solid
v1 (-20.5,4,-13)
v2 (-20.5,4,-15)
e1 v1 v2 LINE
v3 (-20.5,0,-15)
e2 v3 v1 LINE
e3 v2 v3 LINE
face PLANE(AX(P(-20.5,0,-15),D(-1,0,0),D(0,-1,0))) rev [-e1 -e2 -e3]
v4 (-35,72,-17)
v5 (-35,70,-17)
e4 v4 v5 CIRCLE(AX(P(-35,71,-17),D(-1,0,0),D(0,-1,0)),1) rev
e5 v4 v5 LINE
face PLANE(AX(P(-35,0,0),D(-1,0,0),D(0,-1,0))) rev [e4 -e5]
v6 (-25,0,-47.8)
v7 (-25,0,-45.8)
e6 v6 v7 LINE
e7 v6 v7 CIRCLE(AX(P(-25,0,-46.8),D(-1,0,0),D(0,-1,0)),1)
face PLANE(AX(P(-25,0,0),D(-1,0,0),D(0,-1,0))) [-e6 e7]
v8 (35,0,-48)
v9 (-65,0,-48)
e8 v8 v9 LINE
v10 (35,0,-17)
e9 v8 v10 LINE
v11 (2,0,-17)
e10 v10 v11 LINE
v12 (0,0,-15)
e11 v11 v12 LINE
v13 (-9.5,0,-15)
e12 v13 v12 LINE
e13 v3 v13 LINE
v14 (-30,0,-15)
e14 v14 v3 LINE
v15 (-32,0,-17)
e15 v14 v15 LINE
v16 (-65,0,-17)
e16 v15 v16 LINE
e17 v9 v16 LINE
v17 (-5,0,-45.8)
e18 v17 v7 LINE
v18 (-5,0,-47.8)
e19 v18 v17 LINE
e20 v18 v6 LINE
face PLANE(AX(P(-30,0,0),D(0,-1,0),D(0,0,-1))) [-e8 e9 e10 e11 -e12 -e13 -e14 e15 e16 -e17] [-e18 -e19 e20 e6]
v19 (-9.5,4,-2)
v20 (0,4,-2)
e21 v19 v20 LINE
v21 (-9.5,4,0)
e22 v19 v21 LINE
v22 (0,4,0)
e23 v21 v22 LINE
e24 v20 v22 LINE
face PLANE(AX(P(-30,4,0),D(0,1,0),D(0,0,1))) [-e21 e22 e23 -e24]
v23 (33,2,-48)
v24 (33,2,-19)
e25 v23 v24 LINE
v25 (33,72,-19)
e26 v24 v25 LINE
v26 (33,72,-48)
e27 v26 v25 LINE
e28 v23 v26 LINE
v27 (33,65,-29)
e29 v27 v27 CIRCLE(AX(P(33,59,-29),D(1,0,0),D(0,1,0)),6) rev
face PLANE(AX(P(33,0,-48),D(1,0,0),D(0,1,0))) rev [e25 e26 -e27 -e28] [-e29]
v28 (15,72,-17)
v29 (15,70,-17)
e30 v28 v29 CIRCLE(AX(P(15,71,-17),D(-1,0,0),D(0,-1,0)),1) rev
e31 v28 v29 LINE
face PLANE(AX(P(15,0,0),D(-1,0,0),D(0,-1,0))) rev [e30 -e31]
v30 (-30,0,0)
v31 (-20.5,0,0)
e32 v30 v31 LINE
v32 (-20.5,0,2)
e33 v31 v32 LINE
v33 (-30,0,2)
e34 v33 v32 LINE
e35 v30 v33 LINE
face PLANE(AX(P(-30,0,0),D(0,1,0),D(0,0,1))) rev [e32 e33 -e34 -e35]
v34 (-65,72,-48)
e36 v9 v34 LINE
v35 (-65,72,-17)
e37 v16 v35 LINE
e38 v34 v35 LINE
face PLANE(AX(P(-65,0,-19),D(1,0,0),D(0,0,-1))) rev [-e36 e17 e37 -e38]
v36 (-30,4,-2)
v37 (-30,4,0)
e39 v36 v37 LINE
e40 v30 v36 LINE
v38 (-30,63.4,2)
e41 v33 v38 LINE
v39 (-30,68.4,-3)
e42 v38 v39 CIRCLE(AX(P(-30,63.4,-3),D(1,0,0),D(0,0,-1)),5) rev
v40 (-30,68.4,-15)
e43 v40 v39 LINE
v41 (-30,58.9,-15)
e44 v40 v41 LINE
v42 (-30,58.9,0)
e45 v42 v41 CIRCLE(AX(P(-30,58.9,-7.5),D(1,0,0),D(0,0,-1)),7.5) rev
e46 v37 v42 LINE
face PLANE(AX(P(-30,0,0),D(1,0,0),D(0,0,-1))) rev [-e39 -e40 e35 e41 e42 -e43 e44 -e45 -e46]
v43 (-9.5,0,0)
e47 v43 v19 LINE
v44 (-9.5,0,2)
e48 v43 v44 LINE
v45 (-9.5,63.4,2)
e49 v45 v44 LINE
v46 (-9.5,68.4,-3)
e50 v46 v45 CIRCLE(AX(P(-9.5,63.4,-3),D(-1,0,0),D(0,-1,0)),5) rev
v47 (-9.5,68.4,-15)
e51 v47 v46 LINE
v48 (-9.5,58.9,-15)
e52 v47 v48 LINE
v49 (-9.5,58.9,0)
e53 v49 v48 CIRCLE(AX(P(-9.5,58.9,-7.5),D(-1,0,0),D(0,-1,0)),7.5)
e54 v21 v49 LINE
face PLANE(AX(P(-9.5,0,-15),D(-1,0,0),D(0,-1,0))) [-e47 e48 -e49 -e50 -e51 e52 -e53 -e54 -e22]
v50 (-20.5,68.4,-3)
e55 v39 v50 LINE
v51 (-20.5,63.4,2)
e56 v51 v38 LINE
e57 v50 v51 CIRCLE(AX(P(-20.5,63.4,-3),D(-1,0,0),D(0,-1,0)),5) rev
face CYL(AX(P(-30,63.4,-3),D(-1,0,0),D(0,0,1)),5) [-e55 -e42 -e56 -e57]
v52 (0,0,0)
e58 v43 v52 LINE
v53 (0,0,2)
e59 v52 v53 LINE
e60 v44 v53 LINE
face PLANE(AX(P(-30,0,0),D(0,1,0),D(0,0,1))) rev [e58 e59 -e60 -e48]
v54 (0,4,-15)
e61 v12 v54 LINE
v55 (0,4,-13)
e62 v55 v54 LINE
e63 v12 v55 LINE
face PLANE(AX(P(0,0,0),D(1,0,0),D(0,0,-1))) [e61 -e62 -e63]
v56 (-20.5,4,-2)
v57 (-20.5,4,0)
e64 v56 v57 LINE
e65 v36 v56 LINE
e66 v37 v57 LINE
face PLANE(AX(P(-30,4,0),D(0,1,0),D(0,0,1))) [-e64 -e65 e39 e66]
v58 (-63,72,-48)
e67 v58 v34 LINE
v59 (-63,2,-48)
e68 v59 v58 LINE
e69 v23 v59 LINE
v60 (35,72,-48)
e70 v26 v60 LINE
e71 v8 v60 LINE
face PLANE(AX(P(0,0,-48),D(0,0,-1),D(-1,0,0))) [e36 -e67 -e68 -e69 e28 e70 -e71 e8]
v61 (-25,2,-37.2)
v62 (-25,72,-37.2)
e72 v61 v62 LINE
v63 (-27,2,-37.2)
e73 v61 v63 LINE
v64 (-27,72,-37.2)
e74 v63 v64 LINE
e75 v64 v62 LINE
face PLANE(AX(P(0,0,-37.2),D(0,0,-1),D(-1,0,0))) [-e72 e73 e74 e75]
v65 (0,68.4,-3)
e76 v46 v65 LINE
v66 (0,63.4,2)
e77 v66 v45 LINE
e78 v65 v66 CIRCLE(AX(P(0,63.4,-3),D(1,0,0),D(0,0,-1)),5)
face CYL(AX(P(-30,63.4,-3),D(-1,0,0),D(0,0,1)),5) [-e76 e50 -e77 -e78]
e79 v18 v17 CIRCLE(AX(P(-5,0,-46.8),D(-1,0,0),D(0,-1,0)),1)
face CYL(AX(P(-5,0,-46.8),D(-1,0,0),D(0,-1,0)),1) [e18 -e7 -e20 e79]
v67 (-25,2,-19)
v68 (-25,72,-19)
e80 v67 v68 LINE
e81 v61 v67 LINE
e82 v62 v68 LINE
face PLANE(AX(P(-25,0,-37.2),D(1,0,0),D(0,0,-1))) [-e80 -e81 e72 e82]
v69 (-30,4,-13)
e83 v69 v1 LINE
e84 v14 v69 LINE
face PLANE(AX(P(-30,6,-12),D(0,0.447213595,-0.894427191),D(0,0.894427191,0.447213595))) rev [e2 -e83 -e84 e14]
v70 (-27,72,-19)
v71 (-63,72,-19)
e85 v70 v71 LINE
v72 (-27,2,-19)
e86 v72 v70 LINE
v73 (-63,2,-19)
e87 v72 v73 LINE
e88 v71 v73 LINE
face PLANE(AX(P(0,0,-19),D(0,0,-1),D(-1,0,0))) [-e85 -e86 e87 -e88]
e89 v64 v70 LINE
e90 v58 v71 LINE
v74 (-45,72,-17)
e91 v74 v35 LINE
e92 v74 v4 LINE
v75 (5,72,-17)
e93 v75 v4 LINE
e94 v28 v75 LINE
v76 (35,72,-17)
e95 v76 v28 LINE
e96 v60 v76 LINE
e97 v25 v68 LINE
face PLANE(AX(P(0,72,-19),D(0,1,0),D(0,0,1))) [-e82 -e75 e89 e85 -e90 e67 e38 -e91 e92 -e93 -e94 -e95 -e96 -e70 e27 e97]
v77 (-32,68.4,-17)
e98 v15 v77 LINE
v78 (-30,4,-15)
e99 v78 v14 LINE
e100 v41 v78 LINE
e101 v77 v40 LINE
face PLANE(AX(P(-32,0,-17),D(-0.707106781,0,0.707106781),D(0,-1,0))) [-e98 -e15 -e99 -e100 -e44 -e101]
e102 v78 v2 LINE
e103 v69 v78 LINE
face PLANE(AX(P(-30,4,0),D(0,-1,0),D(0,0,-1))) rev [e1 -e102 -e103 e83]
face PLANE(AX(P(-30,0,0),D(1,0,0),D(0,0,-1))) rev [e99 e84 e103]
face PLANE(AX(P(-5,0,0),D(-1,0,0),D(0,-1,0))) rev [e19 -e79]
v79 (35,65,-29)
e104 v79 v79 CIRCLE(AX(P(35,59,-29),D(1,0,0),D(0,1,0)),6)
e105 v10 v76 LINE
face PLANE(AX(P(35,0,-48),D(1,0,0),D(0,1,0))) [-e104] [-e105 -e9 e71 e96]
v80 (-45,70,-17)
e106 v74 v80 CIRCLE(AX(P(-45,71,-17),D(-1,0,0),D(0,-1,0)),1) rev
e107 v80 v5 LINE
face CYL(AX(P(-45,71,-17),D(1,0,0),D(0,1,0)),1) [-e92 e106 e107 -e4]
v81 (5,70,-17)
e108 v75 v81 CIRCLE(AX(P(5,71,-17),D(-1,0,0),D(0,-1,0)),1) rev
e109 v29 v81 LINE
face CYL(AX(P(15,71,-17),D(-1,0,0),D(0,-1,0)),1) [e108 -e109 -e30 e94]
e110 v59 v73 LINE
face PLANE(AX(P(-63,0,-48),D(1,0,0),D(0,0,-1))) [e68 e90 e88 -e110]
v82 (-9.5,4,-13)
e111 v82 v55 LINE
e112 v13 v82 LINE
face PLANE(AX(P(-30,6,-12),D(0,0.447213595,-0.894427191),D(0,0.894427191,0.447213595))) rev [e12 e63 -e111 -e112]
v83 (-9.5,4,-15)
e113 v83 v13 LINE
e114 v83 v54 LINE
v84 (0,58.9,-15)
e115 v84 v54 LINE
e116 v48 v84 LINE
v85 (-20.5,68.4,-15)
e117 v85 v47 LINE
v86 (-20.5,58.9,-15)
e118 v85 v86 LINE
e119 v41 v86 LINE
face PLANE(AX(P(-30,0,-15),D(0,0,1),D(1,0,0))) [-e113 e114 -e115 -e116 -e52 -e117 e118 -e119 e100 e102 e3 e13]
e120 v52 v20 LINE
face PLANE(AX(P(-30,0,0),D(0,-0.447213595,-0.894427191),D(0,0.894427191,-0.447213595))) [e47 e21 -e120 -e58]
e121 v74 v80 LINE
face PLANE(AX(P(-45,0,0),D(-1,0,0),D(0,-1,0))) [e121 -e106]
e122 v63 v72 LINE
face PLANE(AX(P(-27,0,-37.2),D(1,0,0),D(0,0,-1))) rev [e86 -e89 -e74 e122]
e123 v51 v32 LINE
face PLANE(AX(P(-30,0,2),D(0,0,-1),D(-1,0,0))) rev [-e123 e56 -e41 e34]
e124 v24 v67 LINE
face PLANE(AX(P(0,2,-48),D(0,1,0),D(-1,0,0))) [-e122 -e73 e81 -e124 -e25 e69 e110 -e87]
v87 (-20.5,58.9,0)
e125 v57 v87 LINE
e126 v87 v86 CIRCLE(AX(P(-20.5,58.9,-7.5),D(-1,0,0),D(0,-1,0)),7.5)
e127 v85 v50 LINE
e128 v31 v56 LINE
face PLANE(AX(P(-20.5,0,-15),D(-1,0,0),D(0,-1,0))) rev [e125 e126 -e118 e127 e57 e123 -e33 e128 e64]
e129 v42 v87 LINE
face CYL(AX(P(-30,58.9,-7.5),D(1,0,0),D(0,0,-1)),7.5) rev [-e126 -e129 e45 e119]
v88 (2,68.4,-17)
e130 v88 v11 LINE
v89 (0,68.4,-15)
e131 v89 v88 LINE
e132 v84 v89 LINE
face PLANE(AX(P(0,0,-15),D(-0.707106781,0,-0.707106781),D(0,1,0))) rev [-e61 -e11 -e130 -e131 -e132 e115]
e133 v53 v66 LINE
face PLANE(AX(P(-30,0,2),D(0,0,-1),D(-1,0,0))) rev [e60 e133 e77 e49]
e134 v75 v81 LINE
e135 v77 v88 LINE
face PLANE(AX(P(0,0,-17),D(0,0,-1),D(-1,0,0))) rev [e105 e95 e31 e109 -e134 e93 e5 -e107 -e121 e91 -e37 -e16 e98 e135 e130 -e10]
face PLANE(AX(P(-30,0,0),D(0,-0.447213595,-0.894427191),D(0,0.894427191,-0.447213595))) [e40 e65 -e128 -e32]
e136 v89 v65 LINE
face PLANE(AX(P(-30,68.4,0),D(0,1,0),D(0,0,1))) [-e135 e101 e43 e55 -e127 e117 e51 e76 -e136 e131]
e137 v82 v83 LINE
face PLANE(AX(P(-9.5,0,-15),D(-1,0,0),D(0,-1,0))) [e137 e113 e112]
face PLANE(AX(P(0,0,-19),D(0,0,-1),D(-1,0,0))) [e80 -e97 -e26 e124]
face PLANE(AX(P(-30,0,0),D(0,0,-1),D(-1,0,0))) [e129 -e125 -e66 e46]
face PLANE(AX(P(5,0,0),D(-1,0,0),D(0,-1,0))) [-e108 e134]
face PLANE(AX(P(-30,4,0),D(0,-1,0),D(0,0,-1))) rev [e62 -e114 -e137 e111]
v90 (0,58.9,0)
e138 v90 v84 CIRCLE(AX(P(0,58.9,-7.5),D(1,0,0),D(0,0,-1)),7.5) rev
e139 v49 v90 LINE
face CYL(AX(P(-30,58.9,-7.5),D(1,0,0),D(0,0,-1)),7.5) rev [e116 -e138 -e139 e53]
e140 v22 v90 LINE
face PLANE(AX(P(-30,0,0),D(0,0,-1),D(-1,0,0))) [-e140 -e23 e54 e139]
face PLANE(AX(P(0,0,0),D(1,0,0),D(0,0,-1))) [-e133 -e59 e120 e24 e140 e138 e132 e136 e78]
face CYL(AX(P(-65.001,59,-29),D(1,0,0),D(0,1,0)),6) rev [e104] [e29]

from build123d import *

# Parameters (mm, degrees)
BOSS_EXTRUDE1_DEPTH      = 30
FILLET1_R                = 5
SKETCH2_W                = 11
SKETCH2_H                = 68.4
CUT_EXTRUDE1_DEPTH       = 17
BOSS_EXTRUDE3_DEPTH      = 2
BOSS_EXTRUDE4_DEPTH      = 31
SKETCH4_W                = 2
SKETCH4_H                = 70
BOSS_EXTRUDE5_DEPTH      = 18.2
BOSS_EXTRUDE6_DEPTH      = 10
BOSS_EXTRUDE6_DEPTH_BACK = 10
BOSS_EXTRUDE7_START      = 20
BOSS_EXTRUDE7_DEPTH      = 10
BOSS_EXTRUDE8_START      = -30
BOSS_EXTRUDE8_DEPTH      = 10
CHAMFER1_SIZE            = 2
CUT_EXTRUDE2_REACH       = 134.242
SKETCH6_R                = 6


with BuildPart() as part:
    # Sketch1 → Boss-Extrude1 (new body)
    with BuildSketch(Plane(origin=(0, 0, 0), x_dir=(0, 0, -1), z_dir=(1, 0, 0))):
        with BuildLine():
            ThreePointArc((-2, 58.9), (7.5, 68.4), (17, 58.9))
            Line((17, 58.9), (17, 0))
            Line((17, 0), (15, 0))
            Line((15, 0), (15, 58.9))
            ThreePointArc((15, 58.9), (7.5, 66.4), (0, 58.9))
            Line((0, 58.9), (0, 0))
            Line((0, 0), (-2, 0))
            Line((-2, 0), (-2, 58.9))
        make_face()
        with BuildLine():
            Line((-2, 0), (0, 0))
            Line((0, 0), (0, 4))
            Line((0, 4), (0, 58.9))
            ThreePointArc((0, 58.9), (2.196699141, 64.203300859), (7.5, 66.4))
            Line((7.5, 66.4), (7.5, 68.4))
            ThreePointArc((7.5, 68.4), (0.782485579, 65.617514421), (-2, 58.9))
            Line((-2, 58.9), (-2, 0))
        make_face()
        Polygon((0, 4), (0, 0), (2, 4), align=None)
        Polygon((15, 0), (15, 4), (13, 4), align=None)
        with BuildLine():
            Line((17, 68.4), (7.5, 68.4))
            ThreePointArc((7.5, 68.4), (14.217514421, 65.617514421), (17, 58.9))
            Line((17, 58.9), (17, 68.4))
        make_face()
        with BuildLine():
            Line((-2, 68.4), (-2, 58.9))
            ThreePointArc((-2, 58.9), (0.782485579, 65.617514421), (7.5, 68.4))
            Line((7.5, 68.4), (-2, 68.4))
        make_face()
    extrude(amount=-BOSS_EXTRUDE1_DEPTH)

    # Fillet1
    fillet1_edges = [part.edges().sort_by_distance(p)[0] for p in [
        (-15, 68.4, 2),
    ]]
    fillet(fillet1_edges, radius=FILLET1_R)

    # Sketch2 → Cut-Extrude1 (cut)
    with BuildSketch(Plane.XY.offset(2)):
        with Locations((-15, 34.2)):
            Rectangle(SKETCH2_W, SKETCH2_H)
    extrude(amount=-CUT_EXTRUDE1_DEPTH, mode=Mode.SUBTRACT)

    # Sketch3 → Boss-Extrude3 (add)
    with BuildSketch(Plane(origin=(0, 0, -17), x_dir=(-1, 0, 0), z_dir=(0, 0, -1))):
        Polygon((-33, 2), (0, 2), (0, 0), (65, 0), (65, 72), (-33, 72), align=None)
    extrude(amount=BOSS_EXTRUDE3_DEPTH)

    # Sketch3<3> → Boss-Extrude4 (add)
    with BuildSketch(Plane(origin=(0, 0, -17), x_dir=(-1, 0, 0), z_dir=(0, 0, -1))):
        Polygon((65, 72), (63, 72), (63, 2), (-33, 2), (-33, 72), (-35, 72), (-35, 0), (65, 0), align=None)
    extrude(amount=BOSS_EXTRUDE4_DEPTH)

    # Sketch4 → Boss-Extrude5 (add)
    with BuildSketch(Plane(origin=(0, 0, -19), x_dir=(-1, 0, 0), z_dir=(0, 0, -1))):
        with Locations((26, 37)):
            Rectangle(SKETCH4_W, SKETCH4_H)
    extrude(amount=BOSS_EXTRUDE5_DEPTH)

    # Sketch5 → Boss-Extrude6 (add, two sides: drawn at the far end of the back side and taken through both)
    with BuildSketch(Plane.ZY.offset(15).offset(-BOSS_EXTRUDE6_DEPTH_BACK)):
        with BuildLine():
            Line((-47.8, 0), (-45.8, 0))
            ThreePointArc((-45.8, 0), (-46.8, -1), (-47.8, 0))
        make_face()
    extrude(amount=BOSS_EXTRUDE6_DEPTH + BOSS_EXTRUDE6_DEPTH_BACK)

    # Sketch5<3> → Boss-Extrude7 (add)
    with BuildSketch(Plane.ZY.offset(15).offset(BOSS_EXTRUDE7_START)):
        with BuildLine():
            ThreePointArc((-17, 72), (-16, 71), (-17, 70))
            Line((-17, 70), (-17, 72))
        make_face()
    extrude(amount=BOSS_EXTRUDE7_DEPTH)

    # Sketch5<4> → Boss-Extrude8 (add)
    with BuildSketch(Plane.ZY.offset(15).offset(BOSS_EXTRUDE8_START)):
        with BuildLine():
            ThreePointArc((-17, 72), (-16, 71), (-17, 70))
            Line((-17, 70), (-17, 72))
        make_face()
    extrude(amount=BOSS_EXTRUDE8_DEPTH)

    # Chamfer1
    chamfer1_edges = [part.edges().sort_by_distance(p)[0] for p in [
        (-30, 34.2, -17),
        (0, 34.2, -17),
    ]]
    chamfer(chamfer1_edges, length=CHAMFER1_SIZE - 0.0001)  # a hair under: the kernel refuses the full size

    # Sketch6 → Cut-Extrude2 (cut, up to next)
    with BuildSketch(Plane(origin=(35, 0, 0), x_dir=(0, 0, -1), z_dir=(1, 0, 0)), mode=Mode.PRIVATE) as cut_extrude2_sk1:
        with Locations(Location((29, 59, 0), (0, 0, 90))):
            Circle(SKETCH6_R)
    cut_extrude2_tool1 = extrude(cut_extrude2_sk1.sketch, amount=-CUT_EXTRUDE2_REACH, mode=Mode.PRIVATE) & part.part
    add(cut_extrude2_tool1.solids().sort_by_distance((35, 59, -29))[0], mode=Mode.SUBTRACT)


solid = part.part
